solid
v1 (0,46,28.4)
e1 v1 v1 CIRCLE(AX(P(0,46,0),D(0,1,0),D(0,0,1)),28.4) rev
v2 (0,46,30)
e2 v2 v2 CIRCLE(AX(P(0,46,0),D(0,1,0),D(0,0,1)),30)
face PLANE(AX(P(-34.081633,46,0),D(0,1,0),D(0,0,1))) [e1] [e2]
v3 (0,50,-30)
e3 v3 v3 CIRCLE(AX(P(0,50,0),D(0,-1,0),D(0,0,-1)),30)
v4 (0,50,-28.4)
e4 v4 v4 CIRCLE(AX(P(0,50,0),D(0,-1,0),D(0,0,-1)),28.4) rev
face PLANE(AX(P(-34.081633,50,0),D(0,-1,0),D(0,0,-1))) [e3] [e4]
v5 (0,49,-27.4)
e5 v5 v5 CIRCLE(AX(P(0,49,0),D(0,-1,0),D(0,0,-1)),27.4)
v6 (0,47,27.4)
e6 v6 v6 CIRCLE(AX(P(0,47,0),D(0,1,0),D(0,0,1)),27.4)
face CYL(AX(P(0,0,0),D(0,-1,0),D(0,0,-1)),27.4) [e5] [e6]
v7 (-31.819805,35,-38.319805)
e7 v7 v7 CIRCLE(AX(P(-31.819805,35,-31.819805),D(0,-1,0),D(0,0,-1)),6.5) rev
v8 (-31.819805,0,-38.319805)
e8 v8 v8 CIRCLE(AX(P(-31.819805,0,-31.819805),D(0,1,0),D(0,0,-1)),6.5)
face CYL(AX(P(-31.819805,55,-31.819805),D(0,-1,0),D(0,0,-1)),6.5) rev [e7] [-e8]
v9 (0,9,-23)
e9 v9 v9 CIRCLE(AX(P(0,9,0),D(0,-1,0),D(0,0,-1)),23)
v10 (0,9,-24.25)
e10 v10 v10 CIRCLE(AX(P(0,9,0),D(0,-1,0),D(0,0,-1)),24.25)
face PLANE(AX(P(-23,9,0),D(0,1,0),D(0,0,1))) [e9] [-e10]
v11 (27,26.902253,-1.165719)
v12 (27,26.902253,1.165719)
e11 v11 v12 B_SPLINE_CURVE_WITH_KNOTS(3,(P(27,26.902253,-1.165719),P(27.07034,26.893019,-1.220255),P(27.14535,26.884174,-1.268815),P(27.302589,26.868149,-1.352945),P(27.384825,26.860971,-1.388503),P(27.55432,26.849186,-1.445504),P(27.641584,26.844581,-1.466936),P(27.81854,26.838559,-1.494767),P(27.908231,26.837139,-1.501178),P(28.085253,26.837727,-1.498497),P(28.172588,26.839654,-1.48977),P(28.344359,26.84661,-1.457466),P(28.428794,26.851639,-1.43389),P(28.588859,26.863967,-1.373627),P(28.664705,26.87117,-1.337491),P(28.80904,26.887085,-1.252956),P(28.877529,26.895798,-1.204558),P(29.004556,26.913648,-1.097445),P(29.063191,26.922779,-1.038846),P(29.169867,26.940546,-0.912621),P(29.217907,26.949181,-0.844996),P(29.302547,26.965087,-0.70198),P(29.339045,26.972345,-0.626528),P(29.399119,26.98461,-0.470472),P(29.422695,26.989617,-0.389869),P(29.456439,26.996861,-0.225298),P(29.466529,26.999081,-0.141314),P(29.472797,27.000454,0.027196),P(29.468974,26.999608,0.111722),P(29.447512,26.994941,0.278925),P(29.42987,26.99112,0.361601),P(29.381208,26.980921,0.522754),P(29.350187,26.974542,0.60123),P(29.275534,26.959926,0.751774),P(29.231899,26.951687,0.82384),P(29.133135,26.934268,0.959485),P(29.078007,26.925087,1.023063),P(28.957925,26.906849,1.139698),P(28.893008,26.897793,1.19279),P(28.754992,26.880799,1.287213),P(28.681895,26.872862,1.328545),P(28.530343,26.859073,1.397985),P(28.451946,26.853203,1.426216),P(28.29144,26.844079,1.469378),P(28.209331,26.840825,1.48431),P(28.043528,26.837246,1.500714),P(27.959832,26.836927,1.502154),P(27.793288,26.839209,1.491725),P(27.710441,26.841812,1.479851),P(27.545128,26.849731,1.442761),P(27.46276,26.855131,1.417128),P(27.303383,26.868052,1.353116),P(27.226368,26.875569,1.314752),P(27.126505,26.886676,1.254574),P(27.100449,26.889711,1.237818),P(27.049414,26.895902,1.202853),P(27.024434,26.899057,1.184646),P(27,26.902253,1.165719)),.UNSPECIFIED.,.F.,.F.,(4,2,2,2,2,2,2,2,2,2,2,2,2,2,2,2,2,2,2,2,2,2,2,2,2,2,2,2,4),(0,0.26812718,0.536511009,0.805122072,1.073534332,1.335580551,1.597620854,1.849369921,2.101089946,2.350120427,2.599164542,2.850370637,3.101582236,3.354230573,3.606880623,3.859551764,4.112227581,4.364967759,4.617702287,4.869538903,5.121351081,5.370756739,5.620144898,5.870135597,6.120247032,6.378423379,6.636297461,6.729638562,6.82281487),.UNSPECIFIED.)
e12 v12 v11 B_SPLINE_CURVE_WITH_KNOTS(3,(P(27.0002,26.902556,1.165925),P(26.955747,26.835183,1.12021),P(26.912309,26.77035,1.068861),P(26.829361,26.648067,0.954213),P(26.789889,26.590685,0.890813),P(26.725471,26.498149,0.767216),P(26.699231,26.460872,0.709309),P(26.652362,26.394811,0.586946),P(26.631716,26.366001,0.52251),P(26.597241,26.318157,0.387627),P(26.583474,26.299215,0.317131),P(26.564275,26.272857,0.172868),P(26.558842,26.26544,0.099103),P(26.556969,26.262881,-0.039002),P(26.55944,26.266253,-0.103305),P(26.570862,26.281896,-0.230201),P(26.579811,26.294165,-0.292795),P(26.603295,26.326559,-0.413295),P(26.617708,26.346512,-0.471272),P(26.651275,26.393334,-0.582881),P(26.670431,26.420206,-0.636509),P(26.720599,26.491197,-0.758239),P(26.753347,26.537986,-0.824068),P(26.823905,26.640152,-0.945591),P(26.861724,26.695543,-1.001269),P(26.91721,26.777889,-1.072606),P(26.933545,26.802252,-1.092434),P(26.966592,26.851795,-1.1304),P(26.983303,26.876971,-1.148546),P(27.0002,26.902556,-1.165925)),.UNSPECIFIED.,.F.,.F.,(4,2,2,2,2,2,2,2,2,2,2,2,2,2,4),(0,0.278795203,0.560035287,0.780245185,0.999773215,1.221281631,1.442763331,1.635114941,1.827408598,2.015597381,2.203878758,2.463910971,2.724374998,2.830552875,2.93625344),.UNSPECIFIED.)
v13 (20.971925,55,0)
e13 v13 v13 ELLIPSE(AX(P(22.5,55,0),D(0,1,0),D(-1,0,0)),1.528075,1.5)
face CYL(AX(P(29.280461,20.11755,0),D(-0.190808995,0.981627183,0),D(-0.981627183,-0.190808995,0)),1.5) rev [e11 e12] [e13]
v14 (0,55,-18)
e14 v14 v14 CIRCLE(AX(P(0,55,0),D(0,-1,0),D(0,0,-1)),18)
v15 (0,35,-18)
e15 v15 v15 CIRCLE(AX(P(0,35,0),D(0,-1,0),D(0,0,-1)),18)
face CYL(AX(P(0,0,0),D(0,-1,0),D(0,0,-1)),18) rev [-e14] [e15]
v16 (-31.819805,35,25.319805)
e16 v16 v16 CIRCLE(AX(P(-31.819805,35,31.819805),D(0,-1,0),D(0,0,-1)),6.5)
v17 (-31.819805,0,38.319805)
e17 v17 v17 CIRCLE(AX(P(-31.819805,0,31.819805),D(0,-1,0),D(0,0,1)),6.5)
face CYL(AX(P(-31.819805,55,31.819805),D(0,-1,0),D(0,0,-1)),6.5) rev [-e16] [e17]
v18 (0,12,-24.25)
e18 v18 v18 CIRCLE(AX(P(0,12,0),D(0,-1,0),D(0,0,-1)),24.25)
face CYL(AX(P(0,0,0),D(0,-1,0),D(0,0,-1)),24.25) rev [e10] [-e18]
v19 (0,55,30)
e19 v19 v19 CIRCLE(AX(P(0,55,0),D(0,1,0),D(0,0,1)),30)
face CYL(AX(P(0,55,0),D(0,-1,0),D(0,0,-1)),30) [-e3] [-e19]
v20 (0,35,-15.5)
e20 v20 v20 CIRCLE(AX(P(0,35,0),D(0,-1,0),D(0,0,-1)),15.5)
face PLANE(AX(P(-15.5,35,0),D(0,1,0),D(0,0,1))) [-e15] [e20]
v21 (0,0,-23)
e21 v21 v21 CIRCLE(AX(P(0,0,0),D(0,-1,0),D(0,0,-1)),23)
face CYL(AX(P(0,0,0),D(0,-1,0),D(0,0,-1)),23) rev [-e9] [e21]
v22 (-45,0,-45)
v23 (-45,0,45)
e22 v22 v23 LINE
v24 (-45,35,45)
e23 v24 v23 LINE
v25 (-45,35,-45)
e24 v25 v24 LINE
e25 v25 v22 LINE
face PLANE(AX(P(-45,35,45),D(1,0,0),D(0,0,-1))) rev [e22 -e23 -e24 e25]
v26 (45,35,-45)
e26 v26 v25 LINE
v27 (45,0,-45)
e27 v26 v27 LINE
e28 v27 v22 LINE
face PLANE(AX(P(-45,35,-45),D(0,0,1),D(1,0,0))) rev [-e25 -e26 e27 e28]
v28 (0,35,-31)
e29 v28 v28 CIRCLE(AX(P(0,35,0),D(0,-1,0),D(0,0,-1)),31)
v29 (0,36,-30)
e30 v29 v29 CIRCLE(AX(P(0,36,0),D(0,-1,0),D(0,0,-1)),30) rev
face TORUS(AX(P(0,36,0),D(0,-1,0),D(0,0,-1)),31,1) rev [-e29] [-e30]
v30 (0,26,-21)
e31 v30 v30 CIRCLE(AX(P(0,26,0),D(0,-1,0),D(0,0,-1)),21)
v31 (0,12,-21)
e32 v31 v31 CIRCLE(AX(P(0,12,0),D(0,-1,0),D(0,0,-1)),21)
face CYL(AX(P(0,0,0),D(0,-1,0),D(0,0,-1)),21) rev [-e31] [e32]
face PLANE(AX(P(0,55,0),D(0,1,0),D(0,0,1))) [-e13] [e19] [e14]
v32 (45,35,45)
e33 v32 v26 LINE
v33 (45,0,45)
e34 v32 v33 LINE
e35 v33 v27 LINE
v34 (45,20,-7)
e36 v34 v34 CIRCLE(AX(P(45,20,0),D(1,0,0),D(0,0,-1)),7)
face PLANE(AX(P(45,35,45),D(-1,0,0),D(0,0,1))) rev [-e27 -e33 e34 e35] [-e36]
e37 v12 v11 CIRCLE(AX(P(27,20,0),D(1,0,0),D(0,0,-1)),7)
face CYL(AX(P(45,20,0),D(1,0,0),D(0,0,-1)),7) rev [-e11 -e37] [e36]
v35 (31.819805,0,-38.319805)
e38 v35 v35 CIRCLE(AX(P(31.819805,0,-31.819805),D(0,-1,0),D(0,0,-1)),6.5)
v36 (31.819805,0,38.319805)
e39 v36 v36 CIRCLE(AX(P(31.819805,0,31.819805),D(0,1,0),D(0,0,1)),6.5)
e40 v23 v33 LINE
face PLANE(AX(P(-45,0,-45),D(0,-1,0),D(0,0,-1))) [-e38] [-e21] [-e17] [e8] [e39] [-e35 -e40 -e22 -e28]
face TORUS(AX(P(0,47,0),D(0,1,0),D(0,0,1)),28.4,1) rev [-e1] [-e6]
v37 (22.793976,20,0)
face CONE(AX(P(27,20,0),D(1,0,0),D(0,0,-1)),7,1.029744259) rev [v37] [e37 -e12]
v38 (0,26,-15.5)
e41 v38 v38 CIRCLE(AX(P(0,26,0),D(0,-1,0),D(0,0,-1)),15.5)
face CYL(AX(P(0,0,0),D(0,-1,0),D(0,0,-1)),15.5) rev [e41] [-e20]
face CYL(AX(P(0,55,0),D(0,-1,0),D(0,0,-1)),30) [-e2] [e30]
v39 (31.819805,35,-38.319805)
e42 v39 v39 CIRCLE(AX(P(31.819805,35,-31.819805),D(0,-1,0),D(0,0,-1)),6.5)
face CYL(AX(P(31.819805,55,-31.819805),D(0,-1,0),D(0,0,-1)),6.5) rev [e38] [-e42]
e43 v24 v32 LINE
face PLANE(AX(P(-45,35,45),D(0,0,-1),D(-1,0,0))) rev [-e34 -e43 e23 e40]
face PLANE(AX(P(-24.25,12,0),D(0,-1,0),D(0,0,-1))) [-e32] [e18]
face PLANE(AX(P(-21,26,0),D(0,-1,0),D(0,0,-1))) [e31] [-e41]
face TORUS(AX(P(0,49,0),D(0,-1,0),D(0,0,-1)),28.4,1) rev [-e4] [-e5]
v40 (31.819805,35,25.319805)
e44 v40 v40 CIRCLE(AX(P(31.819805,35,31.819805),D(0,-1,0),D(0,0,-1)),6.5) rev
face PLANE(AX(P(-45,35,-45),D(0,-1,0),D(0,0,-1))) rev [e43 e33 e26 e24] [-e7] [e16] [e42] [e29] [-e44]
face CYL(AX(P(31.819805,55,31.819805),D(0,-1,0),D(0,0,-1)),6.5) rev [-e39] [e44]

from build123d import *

# Parameters (mm, degrees)
SKETCH1_W                  = 90
SKETCH1_H                  = 90
EXTRUDE1_DEPTH             = 35
SKETCH2_R                  = 30
EXTRUDE2_DEPTH             = 20
SKETCH5_W                  = 6.681632653
SKETCH5_H                  = 4
SKETCH6_R                  = 6.5
CUT_EXTRUDE1_DEPTH         = 85.113019206
MIRROR2_COPY_1_SKETCH_R    = 6.5
MIRROR2_COPY_1_DEPTH       = 85.113019206
M16X2_0_TAPPED_HOLE1_D     = 14
M16X2_0_TAPPED_HOLE1_DEPTH = 18
M16X2_0_TAPPED_HOLE1_TIP   = 4.206024333
FILLET1_R                  = 1
CUT_SWEEP1_START           = -49.987863257
CUT_SWEEP1_OUTLINE_R       = 1.5
CUT_SWEEP1_DEPTH           = 29.274008659


# Read off the part's stored shape, not the designer's step: Cut-Sweep1
with BuildPart() as part:
    # Sketch1 → Extrude1 (new body)
    with BuildSketch(Plane(origin=(0, 0, 0), x_dir=(1, 0, 0), z_dir=(0, 1, 0))):
        Rectangle(SKETCH1_W, SKETCH1_H)
    extrude(amount=EXTRUDE1_DEPTH)

    # Sketch2 → Extrude2 (add)
    with BuildSketch(Plane(origin=(0, 35, 0), x_dir=(-1, 0, 0), z_dir=(0, 1, 0))):
        with Locations(Location((0, 0, 0), (0, 0, 270))):
            Circle(SKETCH2_R)
    extrude(amount=EXTRUDE2_DEPTH)

    # Sketch3 → Cut-Revolve1 (revolve, cut)
    with BuildSketch(Plane.XY, mode=Mode.PRIVATE) as cut_revolve1_sk:
        Polygon((0, 0), (-23, 0), (-23, 9), (-24.25, 9), (-24.25, 12), (-21, 12), (-21, 26), (-15.5, 26), (-15.5, 35), (-18, 35), (-18, 55), (0, 55), align=None)
    revolve(cut_revolve1_sk.sketch.rotate(Axis((0, 0, 0), (0, 1, 0)), 270), axis=Axis((0, 0, 0), (0, 1, 0)), mode=Mode.SUBTRACT)

    # Sketch5 → Cut-Revolve2 (revolve, cut)
    with BuildSketch(Plane.XY, mode=Mode.PRIVATE) as cut_revolve2_sk:
        with Locations((-30.740816327, 48)):
            Rectangle(SKETCH5_W, SKETCH5_H)
    revolve(cut_revolve2_sk.sketch.rotate(Axis((0, 0, 0), (0, 1, 0)), 270), axis=Axis((0, 0, 0), (0, 1, 0)), mode=Mode.SUBTRACT)

    # Sketch6 → Cut-Extrude1 (cut, through all)
    with BuildSketch(Plane.XZ):
        with Locations(Location((31.819805153, -31.819805153, 0), (0, 0, 270))):
            Circle(SKETCH6_R)
    cut_extrude1 = extrude(amount=-CUT_EXTRUDE1_DEPTH, mode=Mode.SUBTRACT)

    # Mirror1: Cut-Extrude1 across plane
    add(cut_extrude1.mirror(Plane.XY), mode=Mode.SUBTRACT)

    # Mirror2: Cut-Extrude1 across plane
    add(cut_extrude1.mirror(Plane(origin=(0, 0, 0), x_dir=(0, 0, 1), z_dir=(1, 0, 0))), mode=Mode.SUBTRACT)

    # Mirror2 copy 1 sketch → Mirror2 copy 1 (cut, through all)
    with BuildSketch(Plane(origin=(0, 0, 0), x_dir=(-1, 0, 0), z_dir=(0, -1, 0))):
        with Locations(Location((31.819805153, -31.819805153, 0), (0, 0, 270))):
            Circle(MIRROR2_COPY_1_SKETCH_R)
    extrude(amount=-MIRROR2_COPY_1_DEPTH, mode=Mode.SUBTRACT)

    # M16x2.0 Tapped Hole1
    with Locations(Plane(origin=(45, 0, 0), x_dir=(0, 0, -1), z_dir=(1, 0, 0))):
        with Locations((0, 20)):
            Hole(M16X2_0_TAPPED_HOLE1_D / 2, depth=M16X2_0_TAPPED_HOLE1_DEPTH)
            with Locations((0, 0, -(M16X2_0_TAPPED_HOLE1_DEPTH + M16X2_0_TAPPED_HOLE1_TIP / 2))):  # 118° drill point
                Cone(0, M16X2_0_TAPPED_HOLE1_D / 2, M16X2_0_TAPPED_HOLE1_TIP, mode=Mode.SUBTRACT)

    # Fillet1
    fillet1_edges = [part.edges().sort_by_distance(p)[0] for p in [
        (0, 35, 30),
        (0, 50, 27.4),
        (0, 46, 27.4),
    ]]
    fillet(fillet1_edges, radius=FILLET1_R)

    # Cut-Sweep1 outline → Cut-Sweep1 (cut)
    with BuildSketch(Plane(origin=(0, 0, 0), x_dir=(0.981627183447665, 0.19080899537653903, 0), z_dir=(0.19080899537653903, -0.9816271834476651, 0)).offset(CUT_SWEEP1_START)):
        with Locations((32.581106373, 0)):
            Circle(CUT_SWEEP1_OUTLINE_R)
    extrude(amount=CUT_SWEEP1_DEPTH, mode=Mode.SUBTRACT)


solid = part.part
